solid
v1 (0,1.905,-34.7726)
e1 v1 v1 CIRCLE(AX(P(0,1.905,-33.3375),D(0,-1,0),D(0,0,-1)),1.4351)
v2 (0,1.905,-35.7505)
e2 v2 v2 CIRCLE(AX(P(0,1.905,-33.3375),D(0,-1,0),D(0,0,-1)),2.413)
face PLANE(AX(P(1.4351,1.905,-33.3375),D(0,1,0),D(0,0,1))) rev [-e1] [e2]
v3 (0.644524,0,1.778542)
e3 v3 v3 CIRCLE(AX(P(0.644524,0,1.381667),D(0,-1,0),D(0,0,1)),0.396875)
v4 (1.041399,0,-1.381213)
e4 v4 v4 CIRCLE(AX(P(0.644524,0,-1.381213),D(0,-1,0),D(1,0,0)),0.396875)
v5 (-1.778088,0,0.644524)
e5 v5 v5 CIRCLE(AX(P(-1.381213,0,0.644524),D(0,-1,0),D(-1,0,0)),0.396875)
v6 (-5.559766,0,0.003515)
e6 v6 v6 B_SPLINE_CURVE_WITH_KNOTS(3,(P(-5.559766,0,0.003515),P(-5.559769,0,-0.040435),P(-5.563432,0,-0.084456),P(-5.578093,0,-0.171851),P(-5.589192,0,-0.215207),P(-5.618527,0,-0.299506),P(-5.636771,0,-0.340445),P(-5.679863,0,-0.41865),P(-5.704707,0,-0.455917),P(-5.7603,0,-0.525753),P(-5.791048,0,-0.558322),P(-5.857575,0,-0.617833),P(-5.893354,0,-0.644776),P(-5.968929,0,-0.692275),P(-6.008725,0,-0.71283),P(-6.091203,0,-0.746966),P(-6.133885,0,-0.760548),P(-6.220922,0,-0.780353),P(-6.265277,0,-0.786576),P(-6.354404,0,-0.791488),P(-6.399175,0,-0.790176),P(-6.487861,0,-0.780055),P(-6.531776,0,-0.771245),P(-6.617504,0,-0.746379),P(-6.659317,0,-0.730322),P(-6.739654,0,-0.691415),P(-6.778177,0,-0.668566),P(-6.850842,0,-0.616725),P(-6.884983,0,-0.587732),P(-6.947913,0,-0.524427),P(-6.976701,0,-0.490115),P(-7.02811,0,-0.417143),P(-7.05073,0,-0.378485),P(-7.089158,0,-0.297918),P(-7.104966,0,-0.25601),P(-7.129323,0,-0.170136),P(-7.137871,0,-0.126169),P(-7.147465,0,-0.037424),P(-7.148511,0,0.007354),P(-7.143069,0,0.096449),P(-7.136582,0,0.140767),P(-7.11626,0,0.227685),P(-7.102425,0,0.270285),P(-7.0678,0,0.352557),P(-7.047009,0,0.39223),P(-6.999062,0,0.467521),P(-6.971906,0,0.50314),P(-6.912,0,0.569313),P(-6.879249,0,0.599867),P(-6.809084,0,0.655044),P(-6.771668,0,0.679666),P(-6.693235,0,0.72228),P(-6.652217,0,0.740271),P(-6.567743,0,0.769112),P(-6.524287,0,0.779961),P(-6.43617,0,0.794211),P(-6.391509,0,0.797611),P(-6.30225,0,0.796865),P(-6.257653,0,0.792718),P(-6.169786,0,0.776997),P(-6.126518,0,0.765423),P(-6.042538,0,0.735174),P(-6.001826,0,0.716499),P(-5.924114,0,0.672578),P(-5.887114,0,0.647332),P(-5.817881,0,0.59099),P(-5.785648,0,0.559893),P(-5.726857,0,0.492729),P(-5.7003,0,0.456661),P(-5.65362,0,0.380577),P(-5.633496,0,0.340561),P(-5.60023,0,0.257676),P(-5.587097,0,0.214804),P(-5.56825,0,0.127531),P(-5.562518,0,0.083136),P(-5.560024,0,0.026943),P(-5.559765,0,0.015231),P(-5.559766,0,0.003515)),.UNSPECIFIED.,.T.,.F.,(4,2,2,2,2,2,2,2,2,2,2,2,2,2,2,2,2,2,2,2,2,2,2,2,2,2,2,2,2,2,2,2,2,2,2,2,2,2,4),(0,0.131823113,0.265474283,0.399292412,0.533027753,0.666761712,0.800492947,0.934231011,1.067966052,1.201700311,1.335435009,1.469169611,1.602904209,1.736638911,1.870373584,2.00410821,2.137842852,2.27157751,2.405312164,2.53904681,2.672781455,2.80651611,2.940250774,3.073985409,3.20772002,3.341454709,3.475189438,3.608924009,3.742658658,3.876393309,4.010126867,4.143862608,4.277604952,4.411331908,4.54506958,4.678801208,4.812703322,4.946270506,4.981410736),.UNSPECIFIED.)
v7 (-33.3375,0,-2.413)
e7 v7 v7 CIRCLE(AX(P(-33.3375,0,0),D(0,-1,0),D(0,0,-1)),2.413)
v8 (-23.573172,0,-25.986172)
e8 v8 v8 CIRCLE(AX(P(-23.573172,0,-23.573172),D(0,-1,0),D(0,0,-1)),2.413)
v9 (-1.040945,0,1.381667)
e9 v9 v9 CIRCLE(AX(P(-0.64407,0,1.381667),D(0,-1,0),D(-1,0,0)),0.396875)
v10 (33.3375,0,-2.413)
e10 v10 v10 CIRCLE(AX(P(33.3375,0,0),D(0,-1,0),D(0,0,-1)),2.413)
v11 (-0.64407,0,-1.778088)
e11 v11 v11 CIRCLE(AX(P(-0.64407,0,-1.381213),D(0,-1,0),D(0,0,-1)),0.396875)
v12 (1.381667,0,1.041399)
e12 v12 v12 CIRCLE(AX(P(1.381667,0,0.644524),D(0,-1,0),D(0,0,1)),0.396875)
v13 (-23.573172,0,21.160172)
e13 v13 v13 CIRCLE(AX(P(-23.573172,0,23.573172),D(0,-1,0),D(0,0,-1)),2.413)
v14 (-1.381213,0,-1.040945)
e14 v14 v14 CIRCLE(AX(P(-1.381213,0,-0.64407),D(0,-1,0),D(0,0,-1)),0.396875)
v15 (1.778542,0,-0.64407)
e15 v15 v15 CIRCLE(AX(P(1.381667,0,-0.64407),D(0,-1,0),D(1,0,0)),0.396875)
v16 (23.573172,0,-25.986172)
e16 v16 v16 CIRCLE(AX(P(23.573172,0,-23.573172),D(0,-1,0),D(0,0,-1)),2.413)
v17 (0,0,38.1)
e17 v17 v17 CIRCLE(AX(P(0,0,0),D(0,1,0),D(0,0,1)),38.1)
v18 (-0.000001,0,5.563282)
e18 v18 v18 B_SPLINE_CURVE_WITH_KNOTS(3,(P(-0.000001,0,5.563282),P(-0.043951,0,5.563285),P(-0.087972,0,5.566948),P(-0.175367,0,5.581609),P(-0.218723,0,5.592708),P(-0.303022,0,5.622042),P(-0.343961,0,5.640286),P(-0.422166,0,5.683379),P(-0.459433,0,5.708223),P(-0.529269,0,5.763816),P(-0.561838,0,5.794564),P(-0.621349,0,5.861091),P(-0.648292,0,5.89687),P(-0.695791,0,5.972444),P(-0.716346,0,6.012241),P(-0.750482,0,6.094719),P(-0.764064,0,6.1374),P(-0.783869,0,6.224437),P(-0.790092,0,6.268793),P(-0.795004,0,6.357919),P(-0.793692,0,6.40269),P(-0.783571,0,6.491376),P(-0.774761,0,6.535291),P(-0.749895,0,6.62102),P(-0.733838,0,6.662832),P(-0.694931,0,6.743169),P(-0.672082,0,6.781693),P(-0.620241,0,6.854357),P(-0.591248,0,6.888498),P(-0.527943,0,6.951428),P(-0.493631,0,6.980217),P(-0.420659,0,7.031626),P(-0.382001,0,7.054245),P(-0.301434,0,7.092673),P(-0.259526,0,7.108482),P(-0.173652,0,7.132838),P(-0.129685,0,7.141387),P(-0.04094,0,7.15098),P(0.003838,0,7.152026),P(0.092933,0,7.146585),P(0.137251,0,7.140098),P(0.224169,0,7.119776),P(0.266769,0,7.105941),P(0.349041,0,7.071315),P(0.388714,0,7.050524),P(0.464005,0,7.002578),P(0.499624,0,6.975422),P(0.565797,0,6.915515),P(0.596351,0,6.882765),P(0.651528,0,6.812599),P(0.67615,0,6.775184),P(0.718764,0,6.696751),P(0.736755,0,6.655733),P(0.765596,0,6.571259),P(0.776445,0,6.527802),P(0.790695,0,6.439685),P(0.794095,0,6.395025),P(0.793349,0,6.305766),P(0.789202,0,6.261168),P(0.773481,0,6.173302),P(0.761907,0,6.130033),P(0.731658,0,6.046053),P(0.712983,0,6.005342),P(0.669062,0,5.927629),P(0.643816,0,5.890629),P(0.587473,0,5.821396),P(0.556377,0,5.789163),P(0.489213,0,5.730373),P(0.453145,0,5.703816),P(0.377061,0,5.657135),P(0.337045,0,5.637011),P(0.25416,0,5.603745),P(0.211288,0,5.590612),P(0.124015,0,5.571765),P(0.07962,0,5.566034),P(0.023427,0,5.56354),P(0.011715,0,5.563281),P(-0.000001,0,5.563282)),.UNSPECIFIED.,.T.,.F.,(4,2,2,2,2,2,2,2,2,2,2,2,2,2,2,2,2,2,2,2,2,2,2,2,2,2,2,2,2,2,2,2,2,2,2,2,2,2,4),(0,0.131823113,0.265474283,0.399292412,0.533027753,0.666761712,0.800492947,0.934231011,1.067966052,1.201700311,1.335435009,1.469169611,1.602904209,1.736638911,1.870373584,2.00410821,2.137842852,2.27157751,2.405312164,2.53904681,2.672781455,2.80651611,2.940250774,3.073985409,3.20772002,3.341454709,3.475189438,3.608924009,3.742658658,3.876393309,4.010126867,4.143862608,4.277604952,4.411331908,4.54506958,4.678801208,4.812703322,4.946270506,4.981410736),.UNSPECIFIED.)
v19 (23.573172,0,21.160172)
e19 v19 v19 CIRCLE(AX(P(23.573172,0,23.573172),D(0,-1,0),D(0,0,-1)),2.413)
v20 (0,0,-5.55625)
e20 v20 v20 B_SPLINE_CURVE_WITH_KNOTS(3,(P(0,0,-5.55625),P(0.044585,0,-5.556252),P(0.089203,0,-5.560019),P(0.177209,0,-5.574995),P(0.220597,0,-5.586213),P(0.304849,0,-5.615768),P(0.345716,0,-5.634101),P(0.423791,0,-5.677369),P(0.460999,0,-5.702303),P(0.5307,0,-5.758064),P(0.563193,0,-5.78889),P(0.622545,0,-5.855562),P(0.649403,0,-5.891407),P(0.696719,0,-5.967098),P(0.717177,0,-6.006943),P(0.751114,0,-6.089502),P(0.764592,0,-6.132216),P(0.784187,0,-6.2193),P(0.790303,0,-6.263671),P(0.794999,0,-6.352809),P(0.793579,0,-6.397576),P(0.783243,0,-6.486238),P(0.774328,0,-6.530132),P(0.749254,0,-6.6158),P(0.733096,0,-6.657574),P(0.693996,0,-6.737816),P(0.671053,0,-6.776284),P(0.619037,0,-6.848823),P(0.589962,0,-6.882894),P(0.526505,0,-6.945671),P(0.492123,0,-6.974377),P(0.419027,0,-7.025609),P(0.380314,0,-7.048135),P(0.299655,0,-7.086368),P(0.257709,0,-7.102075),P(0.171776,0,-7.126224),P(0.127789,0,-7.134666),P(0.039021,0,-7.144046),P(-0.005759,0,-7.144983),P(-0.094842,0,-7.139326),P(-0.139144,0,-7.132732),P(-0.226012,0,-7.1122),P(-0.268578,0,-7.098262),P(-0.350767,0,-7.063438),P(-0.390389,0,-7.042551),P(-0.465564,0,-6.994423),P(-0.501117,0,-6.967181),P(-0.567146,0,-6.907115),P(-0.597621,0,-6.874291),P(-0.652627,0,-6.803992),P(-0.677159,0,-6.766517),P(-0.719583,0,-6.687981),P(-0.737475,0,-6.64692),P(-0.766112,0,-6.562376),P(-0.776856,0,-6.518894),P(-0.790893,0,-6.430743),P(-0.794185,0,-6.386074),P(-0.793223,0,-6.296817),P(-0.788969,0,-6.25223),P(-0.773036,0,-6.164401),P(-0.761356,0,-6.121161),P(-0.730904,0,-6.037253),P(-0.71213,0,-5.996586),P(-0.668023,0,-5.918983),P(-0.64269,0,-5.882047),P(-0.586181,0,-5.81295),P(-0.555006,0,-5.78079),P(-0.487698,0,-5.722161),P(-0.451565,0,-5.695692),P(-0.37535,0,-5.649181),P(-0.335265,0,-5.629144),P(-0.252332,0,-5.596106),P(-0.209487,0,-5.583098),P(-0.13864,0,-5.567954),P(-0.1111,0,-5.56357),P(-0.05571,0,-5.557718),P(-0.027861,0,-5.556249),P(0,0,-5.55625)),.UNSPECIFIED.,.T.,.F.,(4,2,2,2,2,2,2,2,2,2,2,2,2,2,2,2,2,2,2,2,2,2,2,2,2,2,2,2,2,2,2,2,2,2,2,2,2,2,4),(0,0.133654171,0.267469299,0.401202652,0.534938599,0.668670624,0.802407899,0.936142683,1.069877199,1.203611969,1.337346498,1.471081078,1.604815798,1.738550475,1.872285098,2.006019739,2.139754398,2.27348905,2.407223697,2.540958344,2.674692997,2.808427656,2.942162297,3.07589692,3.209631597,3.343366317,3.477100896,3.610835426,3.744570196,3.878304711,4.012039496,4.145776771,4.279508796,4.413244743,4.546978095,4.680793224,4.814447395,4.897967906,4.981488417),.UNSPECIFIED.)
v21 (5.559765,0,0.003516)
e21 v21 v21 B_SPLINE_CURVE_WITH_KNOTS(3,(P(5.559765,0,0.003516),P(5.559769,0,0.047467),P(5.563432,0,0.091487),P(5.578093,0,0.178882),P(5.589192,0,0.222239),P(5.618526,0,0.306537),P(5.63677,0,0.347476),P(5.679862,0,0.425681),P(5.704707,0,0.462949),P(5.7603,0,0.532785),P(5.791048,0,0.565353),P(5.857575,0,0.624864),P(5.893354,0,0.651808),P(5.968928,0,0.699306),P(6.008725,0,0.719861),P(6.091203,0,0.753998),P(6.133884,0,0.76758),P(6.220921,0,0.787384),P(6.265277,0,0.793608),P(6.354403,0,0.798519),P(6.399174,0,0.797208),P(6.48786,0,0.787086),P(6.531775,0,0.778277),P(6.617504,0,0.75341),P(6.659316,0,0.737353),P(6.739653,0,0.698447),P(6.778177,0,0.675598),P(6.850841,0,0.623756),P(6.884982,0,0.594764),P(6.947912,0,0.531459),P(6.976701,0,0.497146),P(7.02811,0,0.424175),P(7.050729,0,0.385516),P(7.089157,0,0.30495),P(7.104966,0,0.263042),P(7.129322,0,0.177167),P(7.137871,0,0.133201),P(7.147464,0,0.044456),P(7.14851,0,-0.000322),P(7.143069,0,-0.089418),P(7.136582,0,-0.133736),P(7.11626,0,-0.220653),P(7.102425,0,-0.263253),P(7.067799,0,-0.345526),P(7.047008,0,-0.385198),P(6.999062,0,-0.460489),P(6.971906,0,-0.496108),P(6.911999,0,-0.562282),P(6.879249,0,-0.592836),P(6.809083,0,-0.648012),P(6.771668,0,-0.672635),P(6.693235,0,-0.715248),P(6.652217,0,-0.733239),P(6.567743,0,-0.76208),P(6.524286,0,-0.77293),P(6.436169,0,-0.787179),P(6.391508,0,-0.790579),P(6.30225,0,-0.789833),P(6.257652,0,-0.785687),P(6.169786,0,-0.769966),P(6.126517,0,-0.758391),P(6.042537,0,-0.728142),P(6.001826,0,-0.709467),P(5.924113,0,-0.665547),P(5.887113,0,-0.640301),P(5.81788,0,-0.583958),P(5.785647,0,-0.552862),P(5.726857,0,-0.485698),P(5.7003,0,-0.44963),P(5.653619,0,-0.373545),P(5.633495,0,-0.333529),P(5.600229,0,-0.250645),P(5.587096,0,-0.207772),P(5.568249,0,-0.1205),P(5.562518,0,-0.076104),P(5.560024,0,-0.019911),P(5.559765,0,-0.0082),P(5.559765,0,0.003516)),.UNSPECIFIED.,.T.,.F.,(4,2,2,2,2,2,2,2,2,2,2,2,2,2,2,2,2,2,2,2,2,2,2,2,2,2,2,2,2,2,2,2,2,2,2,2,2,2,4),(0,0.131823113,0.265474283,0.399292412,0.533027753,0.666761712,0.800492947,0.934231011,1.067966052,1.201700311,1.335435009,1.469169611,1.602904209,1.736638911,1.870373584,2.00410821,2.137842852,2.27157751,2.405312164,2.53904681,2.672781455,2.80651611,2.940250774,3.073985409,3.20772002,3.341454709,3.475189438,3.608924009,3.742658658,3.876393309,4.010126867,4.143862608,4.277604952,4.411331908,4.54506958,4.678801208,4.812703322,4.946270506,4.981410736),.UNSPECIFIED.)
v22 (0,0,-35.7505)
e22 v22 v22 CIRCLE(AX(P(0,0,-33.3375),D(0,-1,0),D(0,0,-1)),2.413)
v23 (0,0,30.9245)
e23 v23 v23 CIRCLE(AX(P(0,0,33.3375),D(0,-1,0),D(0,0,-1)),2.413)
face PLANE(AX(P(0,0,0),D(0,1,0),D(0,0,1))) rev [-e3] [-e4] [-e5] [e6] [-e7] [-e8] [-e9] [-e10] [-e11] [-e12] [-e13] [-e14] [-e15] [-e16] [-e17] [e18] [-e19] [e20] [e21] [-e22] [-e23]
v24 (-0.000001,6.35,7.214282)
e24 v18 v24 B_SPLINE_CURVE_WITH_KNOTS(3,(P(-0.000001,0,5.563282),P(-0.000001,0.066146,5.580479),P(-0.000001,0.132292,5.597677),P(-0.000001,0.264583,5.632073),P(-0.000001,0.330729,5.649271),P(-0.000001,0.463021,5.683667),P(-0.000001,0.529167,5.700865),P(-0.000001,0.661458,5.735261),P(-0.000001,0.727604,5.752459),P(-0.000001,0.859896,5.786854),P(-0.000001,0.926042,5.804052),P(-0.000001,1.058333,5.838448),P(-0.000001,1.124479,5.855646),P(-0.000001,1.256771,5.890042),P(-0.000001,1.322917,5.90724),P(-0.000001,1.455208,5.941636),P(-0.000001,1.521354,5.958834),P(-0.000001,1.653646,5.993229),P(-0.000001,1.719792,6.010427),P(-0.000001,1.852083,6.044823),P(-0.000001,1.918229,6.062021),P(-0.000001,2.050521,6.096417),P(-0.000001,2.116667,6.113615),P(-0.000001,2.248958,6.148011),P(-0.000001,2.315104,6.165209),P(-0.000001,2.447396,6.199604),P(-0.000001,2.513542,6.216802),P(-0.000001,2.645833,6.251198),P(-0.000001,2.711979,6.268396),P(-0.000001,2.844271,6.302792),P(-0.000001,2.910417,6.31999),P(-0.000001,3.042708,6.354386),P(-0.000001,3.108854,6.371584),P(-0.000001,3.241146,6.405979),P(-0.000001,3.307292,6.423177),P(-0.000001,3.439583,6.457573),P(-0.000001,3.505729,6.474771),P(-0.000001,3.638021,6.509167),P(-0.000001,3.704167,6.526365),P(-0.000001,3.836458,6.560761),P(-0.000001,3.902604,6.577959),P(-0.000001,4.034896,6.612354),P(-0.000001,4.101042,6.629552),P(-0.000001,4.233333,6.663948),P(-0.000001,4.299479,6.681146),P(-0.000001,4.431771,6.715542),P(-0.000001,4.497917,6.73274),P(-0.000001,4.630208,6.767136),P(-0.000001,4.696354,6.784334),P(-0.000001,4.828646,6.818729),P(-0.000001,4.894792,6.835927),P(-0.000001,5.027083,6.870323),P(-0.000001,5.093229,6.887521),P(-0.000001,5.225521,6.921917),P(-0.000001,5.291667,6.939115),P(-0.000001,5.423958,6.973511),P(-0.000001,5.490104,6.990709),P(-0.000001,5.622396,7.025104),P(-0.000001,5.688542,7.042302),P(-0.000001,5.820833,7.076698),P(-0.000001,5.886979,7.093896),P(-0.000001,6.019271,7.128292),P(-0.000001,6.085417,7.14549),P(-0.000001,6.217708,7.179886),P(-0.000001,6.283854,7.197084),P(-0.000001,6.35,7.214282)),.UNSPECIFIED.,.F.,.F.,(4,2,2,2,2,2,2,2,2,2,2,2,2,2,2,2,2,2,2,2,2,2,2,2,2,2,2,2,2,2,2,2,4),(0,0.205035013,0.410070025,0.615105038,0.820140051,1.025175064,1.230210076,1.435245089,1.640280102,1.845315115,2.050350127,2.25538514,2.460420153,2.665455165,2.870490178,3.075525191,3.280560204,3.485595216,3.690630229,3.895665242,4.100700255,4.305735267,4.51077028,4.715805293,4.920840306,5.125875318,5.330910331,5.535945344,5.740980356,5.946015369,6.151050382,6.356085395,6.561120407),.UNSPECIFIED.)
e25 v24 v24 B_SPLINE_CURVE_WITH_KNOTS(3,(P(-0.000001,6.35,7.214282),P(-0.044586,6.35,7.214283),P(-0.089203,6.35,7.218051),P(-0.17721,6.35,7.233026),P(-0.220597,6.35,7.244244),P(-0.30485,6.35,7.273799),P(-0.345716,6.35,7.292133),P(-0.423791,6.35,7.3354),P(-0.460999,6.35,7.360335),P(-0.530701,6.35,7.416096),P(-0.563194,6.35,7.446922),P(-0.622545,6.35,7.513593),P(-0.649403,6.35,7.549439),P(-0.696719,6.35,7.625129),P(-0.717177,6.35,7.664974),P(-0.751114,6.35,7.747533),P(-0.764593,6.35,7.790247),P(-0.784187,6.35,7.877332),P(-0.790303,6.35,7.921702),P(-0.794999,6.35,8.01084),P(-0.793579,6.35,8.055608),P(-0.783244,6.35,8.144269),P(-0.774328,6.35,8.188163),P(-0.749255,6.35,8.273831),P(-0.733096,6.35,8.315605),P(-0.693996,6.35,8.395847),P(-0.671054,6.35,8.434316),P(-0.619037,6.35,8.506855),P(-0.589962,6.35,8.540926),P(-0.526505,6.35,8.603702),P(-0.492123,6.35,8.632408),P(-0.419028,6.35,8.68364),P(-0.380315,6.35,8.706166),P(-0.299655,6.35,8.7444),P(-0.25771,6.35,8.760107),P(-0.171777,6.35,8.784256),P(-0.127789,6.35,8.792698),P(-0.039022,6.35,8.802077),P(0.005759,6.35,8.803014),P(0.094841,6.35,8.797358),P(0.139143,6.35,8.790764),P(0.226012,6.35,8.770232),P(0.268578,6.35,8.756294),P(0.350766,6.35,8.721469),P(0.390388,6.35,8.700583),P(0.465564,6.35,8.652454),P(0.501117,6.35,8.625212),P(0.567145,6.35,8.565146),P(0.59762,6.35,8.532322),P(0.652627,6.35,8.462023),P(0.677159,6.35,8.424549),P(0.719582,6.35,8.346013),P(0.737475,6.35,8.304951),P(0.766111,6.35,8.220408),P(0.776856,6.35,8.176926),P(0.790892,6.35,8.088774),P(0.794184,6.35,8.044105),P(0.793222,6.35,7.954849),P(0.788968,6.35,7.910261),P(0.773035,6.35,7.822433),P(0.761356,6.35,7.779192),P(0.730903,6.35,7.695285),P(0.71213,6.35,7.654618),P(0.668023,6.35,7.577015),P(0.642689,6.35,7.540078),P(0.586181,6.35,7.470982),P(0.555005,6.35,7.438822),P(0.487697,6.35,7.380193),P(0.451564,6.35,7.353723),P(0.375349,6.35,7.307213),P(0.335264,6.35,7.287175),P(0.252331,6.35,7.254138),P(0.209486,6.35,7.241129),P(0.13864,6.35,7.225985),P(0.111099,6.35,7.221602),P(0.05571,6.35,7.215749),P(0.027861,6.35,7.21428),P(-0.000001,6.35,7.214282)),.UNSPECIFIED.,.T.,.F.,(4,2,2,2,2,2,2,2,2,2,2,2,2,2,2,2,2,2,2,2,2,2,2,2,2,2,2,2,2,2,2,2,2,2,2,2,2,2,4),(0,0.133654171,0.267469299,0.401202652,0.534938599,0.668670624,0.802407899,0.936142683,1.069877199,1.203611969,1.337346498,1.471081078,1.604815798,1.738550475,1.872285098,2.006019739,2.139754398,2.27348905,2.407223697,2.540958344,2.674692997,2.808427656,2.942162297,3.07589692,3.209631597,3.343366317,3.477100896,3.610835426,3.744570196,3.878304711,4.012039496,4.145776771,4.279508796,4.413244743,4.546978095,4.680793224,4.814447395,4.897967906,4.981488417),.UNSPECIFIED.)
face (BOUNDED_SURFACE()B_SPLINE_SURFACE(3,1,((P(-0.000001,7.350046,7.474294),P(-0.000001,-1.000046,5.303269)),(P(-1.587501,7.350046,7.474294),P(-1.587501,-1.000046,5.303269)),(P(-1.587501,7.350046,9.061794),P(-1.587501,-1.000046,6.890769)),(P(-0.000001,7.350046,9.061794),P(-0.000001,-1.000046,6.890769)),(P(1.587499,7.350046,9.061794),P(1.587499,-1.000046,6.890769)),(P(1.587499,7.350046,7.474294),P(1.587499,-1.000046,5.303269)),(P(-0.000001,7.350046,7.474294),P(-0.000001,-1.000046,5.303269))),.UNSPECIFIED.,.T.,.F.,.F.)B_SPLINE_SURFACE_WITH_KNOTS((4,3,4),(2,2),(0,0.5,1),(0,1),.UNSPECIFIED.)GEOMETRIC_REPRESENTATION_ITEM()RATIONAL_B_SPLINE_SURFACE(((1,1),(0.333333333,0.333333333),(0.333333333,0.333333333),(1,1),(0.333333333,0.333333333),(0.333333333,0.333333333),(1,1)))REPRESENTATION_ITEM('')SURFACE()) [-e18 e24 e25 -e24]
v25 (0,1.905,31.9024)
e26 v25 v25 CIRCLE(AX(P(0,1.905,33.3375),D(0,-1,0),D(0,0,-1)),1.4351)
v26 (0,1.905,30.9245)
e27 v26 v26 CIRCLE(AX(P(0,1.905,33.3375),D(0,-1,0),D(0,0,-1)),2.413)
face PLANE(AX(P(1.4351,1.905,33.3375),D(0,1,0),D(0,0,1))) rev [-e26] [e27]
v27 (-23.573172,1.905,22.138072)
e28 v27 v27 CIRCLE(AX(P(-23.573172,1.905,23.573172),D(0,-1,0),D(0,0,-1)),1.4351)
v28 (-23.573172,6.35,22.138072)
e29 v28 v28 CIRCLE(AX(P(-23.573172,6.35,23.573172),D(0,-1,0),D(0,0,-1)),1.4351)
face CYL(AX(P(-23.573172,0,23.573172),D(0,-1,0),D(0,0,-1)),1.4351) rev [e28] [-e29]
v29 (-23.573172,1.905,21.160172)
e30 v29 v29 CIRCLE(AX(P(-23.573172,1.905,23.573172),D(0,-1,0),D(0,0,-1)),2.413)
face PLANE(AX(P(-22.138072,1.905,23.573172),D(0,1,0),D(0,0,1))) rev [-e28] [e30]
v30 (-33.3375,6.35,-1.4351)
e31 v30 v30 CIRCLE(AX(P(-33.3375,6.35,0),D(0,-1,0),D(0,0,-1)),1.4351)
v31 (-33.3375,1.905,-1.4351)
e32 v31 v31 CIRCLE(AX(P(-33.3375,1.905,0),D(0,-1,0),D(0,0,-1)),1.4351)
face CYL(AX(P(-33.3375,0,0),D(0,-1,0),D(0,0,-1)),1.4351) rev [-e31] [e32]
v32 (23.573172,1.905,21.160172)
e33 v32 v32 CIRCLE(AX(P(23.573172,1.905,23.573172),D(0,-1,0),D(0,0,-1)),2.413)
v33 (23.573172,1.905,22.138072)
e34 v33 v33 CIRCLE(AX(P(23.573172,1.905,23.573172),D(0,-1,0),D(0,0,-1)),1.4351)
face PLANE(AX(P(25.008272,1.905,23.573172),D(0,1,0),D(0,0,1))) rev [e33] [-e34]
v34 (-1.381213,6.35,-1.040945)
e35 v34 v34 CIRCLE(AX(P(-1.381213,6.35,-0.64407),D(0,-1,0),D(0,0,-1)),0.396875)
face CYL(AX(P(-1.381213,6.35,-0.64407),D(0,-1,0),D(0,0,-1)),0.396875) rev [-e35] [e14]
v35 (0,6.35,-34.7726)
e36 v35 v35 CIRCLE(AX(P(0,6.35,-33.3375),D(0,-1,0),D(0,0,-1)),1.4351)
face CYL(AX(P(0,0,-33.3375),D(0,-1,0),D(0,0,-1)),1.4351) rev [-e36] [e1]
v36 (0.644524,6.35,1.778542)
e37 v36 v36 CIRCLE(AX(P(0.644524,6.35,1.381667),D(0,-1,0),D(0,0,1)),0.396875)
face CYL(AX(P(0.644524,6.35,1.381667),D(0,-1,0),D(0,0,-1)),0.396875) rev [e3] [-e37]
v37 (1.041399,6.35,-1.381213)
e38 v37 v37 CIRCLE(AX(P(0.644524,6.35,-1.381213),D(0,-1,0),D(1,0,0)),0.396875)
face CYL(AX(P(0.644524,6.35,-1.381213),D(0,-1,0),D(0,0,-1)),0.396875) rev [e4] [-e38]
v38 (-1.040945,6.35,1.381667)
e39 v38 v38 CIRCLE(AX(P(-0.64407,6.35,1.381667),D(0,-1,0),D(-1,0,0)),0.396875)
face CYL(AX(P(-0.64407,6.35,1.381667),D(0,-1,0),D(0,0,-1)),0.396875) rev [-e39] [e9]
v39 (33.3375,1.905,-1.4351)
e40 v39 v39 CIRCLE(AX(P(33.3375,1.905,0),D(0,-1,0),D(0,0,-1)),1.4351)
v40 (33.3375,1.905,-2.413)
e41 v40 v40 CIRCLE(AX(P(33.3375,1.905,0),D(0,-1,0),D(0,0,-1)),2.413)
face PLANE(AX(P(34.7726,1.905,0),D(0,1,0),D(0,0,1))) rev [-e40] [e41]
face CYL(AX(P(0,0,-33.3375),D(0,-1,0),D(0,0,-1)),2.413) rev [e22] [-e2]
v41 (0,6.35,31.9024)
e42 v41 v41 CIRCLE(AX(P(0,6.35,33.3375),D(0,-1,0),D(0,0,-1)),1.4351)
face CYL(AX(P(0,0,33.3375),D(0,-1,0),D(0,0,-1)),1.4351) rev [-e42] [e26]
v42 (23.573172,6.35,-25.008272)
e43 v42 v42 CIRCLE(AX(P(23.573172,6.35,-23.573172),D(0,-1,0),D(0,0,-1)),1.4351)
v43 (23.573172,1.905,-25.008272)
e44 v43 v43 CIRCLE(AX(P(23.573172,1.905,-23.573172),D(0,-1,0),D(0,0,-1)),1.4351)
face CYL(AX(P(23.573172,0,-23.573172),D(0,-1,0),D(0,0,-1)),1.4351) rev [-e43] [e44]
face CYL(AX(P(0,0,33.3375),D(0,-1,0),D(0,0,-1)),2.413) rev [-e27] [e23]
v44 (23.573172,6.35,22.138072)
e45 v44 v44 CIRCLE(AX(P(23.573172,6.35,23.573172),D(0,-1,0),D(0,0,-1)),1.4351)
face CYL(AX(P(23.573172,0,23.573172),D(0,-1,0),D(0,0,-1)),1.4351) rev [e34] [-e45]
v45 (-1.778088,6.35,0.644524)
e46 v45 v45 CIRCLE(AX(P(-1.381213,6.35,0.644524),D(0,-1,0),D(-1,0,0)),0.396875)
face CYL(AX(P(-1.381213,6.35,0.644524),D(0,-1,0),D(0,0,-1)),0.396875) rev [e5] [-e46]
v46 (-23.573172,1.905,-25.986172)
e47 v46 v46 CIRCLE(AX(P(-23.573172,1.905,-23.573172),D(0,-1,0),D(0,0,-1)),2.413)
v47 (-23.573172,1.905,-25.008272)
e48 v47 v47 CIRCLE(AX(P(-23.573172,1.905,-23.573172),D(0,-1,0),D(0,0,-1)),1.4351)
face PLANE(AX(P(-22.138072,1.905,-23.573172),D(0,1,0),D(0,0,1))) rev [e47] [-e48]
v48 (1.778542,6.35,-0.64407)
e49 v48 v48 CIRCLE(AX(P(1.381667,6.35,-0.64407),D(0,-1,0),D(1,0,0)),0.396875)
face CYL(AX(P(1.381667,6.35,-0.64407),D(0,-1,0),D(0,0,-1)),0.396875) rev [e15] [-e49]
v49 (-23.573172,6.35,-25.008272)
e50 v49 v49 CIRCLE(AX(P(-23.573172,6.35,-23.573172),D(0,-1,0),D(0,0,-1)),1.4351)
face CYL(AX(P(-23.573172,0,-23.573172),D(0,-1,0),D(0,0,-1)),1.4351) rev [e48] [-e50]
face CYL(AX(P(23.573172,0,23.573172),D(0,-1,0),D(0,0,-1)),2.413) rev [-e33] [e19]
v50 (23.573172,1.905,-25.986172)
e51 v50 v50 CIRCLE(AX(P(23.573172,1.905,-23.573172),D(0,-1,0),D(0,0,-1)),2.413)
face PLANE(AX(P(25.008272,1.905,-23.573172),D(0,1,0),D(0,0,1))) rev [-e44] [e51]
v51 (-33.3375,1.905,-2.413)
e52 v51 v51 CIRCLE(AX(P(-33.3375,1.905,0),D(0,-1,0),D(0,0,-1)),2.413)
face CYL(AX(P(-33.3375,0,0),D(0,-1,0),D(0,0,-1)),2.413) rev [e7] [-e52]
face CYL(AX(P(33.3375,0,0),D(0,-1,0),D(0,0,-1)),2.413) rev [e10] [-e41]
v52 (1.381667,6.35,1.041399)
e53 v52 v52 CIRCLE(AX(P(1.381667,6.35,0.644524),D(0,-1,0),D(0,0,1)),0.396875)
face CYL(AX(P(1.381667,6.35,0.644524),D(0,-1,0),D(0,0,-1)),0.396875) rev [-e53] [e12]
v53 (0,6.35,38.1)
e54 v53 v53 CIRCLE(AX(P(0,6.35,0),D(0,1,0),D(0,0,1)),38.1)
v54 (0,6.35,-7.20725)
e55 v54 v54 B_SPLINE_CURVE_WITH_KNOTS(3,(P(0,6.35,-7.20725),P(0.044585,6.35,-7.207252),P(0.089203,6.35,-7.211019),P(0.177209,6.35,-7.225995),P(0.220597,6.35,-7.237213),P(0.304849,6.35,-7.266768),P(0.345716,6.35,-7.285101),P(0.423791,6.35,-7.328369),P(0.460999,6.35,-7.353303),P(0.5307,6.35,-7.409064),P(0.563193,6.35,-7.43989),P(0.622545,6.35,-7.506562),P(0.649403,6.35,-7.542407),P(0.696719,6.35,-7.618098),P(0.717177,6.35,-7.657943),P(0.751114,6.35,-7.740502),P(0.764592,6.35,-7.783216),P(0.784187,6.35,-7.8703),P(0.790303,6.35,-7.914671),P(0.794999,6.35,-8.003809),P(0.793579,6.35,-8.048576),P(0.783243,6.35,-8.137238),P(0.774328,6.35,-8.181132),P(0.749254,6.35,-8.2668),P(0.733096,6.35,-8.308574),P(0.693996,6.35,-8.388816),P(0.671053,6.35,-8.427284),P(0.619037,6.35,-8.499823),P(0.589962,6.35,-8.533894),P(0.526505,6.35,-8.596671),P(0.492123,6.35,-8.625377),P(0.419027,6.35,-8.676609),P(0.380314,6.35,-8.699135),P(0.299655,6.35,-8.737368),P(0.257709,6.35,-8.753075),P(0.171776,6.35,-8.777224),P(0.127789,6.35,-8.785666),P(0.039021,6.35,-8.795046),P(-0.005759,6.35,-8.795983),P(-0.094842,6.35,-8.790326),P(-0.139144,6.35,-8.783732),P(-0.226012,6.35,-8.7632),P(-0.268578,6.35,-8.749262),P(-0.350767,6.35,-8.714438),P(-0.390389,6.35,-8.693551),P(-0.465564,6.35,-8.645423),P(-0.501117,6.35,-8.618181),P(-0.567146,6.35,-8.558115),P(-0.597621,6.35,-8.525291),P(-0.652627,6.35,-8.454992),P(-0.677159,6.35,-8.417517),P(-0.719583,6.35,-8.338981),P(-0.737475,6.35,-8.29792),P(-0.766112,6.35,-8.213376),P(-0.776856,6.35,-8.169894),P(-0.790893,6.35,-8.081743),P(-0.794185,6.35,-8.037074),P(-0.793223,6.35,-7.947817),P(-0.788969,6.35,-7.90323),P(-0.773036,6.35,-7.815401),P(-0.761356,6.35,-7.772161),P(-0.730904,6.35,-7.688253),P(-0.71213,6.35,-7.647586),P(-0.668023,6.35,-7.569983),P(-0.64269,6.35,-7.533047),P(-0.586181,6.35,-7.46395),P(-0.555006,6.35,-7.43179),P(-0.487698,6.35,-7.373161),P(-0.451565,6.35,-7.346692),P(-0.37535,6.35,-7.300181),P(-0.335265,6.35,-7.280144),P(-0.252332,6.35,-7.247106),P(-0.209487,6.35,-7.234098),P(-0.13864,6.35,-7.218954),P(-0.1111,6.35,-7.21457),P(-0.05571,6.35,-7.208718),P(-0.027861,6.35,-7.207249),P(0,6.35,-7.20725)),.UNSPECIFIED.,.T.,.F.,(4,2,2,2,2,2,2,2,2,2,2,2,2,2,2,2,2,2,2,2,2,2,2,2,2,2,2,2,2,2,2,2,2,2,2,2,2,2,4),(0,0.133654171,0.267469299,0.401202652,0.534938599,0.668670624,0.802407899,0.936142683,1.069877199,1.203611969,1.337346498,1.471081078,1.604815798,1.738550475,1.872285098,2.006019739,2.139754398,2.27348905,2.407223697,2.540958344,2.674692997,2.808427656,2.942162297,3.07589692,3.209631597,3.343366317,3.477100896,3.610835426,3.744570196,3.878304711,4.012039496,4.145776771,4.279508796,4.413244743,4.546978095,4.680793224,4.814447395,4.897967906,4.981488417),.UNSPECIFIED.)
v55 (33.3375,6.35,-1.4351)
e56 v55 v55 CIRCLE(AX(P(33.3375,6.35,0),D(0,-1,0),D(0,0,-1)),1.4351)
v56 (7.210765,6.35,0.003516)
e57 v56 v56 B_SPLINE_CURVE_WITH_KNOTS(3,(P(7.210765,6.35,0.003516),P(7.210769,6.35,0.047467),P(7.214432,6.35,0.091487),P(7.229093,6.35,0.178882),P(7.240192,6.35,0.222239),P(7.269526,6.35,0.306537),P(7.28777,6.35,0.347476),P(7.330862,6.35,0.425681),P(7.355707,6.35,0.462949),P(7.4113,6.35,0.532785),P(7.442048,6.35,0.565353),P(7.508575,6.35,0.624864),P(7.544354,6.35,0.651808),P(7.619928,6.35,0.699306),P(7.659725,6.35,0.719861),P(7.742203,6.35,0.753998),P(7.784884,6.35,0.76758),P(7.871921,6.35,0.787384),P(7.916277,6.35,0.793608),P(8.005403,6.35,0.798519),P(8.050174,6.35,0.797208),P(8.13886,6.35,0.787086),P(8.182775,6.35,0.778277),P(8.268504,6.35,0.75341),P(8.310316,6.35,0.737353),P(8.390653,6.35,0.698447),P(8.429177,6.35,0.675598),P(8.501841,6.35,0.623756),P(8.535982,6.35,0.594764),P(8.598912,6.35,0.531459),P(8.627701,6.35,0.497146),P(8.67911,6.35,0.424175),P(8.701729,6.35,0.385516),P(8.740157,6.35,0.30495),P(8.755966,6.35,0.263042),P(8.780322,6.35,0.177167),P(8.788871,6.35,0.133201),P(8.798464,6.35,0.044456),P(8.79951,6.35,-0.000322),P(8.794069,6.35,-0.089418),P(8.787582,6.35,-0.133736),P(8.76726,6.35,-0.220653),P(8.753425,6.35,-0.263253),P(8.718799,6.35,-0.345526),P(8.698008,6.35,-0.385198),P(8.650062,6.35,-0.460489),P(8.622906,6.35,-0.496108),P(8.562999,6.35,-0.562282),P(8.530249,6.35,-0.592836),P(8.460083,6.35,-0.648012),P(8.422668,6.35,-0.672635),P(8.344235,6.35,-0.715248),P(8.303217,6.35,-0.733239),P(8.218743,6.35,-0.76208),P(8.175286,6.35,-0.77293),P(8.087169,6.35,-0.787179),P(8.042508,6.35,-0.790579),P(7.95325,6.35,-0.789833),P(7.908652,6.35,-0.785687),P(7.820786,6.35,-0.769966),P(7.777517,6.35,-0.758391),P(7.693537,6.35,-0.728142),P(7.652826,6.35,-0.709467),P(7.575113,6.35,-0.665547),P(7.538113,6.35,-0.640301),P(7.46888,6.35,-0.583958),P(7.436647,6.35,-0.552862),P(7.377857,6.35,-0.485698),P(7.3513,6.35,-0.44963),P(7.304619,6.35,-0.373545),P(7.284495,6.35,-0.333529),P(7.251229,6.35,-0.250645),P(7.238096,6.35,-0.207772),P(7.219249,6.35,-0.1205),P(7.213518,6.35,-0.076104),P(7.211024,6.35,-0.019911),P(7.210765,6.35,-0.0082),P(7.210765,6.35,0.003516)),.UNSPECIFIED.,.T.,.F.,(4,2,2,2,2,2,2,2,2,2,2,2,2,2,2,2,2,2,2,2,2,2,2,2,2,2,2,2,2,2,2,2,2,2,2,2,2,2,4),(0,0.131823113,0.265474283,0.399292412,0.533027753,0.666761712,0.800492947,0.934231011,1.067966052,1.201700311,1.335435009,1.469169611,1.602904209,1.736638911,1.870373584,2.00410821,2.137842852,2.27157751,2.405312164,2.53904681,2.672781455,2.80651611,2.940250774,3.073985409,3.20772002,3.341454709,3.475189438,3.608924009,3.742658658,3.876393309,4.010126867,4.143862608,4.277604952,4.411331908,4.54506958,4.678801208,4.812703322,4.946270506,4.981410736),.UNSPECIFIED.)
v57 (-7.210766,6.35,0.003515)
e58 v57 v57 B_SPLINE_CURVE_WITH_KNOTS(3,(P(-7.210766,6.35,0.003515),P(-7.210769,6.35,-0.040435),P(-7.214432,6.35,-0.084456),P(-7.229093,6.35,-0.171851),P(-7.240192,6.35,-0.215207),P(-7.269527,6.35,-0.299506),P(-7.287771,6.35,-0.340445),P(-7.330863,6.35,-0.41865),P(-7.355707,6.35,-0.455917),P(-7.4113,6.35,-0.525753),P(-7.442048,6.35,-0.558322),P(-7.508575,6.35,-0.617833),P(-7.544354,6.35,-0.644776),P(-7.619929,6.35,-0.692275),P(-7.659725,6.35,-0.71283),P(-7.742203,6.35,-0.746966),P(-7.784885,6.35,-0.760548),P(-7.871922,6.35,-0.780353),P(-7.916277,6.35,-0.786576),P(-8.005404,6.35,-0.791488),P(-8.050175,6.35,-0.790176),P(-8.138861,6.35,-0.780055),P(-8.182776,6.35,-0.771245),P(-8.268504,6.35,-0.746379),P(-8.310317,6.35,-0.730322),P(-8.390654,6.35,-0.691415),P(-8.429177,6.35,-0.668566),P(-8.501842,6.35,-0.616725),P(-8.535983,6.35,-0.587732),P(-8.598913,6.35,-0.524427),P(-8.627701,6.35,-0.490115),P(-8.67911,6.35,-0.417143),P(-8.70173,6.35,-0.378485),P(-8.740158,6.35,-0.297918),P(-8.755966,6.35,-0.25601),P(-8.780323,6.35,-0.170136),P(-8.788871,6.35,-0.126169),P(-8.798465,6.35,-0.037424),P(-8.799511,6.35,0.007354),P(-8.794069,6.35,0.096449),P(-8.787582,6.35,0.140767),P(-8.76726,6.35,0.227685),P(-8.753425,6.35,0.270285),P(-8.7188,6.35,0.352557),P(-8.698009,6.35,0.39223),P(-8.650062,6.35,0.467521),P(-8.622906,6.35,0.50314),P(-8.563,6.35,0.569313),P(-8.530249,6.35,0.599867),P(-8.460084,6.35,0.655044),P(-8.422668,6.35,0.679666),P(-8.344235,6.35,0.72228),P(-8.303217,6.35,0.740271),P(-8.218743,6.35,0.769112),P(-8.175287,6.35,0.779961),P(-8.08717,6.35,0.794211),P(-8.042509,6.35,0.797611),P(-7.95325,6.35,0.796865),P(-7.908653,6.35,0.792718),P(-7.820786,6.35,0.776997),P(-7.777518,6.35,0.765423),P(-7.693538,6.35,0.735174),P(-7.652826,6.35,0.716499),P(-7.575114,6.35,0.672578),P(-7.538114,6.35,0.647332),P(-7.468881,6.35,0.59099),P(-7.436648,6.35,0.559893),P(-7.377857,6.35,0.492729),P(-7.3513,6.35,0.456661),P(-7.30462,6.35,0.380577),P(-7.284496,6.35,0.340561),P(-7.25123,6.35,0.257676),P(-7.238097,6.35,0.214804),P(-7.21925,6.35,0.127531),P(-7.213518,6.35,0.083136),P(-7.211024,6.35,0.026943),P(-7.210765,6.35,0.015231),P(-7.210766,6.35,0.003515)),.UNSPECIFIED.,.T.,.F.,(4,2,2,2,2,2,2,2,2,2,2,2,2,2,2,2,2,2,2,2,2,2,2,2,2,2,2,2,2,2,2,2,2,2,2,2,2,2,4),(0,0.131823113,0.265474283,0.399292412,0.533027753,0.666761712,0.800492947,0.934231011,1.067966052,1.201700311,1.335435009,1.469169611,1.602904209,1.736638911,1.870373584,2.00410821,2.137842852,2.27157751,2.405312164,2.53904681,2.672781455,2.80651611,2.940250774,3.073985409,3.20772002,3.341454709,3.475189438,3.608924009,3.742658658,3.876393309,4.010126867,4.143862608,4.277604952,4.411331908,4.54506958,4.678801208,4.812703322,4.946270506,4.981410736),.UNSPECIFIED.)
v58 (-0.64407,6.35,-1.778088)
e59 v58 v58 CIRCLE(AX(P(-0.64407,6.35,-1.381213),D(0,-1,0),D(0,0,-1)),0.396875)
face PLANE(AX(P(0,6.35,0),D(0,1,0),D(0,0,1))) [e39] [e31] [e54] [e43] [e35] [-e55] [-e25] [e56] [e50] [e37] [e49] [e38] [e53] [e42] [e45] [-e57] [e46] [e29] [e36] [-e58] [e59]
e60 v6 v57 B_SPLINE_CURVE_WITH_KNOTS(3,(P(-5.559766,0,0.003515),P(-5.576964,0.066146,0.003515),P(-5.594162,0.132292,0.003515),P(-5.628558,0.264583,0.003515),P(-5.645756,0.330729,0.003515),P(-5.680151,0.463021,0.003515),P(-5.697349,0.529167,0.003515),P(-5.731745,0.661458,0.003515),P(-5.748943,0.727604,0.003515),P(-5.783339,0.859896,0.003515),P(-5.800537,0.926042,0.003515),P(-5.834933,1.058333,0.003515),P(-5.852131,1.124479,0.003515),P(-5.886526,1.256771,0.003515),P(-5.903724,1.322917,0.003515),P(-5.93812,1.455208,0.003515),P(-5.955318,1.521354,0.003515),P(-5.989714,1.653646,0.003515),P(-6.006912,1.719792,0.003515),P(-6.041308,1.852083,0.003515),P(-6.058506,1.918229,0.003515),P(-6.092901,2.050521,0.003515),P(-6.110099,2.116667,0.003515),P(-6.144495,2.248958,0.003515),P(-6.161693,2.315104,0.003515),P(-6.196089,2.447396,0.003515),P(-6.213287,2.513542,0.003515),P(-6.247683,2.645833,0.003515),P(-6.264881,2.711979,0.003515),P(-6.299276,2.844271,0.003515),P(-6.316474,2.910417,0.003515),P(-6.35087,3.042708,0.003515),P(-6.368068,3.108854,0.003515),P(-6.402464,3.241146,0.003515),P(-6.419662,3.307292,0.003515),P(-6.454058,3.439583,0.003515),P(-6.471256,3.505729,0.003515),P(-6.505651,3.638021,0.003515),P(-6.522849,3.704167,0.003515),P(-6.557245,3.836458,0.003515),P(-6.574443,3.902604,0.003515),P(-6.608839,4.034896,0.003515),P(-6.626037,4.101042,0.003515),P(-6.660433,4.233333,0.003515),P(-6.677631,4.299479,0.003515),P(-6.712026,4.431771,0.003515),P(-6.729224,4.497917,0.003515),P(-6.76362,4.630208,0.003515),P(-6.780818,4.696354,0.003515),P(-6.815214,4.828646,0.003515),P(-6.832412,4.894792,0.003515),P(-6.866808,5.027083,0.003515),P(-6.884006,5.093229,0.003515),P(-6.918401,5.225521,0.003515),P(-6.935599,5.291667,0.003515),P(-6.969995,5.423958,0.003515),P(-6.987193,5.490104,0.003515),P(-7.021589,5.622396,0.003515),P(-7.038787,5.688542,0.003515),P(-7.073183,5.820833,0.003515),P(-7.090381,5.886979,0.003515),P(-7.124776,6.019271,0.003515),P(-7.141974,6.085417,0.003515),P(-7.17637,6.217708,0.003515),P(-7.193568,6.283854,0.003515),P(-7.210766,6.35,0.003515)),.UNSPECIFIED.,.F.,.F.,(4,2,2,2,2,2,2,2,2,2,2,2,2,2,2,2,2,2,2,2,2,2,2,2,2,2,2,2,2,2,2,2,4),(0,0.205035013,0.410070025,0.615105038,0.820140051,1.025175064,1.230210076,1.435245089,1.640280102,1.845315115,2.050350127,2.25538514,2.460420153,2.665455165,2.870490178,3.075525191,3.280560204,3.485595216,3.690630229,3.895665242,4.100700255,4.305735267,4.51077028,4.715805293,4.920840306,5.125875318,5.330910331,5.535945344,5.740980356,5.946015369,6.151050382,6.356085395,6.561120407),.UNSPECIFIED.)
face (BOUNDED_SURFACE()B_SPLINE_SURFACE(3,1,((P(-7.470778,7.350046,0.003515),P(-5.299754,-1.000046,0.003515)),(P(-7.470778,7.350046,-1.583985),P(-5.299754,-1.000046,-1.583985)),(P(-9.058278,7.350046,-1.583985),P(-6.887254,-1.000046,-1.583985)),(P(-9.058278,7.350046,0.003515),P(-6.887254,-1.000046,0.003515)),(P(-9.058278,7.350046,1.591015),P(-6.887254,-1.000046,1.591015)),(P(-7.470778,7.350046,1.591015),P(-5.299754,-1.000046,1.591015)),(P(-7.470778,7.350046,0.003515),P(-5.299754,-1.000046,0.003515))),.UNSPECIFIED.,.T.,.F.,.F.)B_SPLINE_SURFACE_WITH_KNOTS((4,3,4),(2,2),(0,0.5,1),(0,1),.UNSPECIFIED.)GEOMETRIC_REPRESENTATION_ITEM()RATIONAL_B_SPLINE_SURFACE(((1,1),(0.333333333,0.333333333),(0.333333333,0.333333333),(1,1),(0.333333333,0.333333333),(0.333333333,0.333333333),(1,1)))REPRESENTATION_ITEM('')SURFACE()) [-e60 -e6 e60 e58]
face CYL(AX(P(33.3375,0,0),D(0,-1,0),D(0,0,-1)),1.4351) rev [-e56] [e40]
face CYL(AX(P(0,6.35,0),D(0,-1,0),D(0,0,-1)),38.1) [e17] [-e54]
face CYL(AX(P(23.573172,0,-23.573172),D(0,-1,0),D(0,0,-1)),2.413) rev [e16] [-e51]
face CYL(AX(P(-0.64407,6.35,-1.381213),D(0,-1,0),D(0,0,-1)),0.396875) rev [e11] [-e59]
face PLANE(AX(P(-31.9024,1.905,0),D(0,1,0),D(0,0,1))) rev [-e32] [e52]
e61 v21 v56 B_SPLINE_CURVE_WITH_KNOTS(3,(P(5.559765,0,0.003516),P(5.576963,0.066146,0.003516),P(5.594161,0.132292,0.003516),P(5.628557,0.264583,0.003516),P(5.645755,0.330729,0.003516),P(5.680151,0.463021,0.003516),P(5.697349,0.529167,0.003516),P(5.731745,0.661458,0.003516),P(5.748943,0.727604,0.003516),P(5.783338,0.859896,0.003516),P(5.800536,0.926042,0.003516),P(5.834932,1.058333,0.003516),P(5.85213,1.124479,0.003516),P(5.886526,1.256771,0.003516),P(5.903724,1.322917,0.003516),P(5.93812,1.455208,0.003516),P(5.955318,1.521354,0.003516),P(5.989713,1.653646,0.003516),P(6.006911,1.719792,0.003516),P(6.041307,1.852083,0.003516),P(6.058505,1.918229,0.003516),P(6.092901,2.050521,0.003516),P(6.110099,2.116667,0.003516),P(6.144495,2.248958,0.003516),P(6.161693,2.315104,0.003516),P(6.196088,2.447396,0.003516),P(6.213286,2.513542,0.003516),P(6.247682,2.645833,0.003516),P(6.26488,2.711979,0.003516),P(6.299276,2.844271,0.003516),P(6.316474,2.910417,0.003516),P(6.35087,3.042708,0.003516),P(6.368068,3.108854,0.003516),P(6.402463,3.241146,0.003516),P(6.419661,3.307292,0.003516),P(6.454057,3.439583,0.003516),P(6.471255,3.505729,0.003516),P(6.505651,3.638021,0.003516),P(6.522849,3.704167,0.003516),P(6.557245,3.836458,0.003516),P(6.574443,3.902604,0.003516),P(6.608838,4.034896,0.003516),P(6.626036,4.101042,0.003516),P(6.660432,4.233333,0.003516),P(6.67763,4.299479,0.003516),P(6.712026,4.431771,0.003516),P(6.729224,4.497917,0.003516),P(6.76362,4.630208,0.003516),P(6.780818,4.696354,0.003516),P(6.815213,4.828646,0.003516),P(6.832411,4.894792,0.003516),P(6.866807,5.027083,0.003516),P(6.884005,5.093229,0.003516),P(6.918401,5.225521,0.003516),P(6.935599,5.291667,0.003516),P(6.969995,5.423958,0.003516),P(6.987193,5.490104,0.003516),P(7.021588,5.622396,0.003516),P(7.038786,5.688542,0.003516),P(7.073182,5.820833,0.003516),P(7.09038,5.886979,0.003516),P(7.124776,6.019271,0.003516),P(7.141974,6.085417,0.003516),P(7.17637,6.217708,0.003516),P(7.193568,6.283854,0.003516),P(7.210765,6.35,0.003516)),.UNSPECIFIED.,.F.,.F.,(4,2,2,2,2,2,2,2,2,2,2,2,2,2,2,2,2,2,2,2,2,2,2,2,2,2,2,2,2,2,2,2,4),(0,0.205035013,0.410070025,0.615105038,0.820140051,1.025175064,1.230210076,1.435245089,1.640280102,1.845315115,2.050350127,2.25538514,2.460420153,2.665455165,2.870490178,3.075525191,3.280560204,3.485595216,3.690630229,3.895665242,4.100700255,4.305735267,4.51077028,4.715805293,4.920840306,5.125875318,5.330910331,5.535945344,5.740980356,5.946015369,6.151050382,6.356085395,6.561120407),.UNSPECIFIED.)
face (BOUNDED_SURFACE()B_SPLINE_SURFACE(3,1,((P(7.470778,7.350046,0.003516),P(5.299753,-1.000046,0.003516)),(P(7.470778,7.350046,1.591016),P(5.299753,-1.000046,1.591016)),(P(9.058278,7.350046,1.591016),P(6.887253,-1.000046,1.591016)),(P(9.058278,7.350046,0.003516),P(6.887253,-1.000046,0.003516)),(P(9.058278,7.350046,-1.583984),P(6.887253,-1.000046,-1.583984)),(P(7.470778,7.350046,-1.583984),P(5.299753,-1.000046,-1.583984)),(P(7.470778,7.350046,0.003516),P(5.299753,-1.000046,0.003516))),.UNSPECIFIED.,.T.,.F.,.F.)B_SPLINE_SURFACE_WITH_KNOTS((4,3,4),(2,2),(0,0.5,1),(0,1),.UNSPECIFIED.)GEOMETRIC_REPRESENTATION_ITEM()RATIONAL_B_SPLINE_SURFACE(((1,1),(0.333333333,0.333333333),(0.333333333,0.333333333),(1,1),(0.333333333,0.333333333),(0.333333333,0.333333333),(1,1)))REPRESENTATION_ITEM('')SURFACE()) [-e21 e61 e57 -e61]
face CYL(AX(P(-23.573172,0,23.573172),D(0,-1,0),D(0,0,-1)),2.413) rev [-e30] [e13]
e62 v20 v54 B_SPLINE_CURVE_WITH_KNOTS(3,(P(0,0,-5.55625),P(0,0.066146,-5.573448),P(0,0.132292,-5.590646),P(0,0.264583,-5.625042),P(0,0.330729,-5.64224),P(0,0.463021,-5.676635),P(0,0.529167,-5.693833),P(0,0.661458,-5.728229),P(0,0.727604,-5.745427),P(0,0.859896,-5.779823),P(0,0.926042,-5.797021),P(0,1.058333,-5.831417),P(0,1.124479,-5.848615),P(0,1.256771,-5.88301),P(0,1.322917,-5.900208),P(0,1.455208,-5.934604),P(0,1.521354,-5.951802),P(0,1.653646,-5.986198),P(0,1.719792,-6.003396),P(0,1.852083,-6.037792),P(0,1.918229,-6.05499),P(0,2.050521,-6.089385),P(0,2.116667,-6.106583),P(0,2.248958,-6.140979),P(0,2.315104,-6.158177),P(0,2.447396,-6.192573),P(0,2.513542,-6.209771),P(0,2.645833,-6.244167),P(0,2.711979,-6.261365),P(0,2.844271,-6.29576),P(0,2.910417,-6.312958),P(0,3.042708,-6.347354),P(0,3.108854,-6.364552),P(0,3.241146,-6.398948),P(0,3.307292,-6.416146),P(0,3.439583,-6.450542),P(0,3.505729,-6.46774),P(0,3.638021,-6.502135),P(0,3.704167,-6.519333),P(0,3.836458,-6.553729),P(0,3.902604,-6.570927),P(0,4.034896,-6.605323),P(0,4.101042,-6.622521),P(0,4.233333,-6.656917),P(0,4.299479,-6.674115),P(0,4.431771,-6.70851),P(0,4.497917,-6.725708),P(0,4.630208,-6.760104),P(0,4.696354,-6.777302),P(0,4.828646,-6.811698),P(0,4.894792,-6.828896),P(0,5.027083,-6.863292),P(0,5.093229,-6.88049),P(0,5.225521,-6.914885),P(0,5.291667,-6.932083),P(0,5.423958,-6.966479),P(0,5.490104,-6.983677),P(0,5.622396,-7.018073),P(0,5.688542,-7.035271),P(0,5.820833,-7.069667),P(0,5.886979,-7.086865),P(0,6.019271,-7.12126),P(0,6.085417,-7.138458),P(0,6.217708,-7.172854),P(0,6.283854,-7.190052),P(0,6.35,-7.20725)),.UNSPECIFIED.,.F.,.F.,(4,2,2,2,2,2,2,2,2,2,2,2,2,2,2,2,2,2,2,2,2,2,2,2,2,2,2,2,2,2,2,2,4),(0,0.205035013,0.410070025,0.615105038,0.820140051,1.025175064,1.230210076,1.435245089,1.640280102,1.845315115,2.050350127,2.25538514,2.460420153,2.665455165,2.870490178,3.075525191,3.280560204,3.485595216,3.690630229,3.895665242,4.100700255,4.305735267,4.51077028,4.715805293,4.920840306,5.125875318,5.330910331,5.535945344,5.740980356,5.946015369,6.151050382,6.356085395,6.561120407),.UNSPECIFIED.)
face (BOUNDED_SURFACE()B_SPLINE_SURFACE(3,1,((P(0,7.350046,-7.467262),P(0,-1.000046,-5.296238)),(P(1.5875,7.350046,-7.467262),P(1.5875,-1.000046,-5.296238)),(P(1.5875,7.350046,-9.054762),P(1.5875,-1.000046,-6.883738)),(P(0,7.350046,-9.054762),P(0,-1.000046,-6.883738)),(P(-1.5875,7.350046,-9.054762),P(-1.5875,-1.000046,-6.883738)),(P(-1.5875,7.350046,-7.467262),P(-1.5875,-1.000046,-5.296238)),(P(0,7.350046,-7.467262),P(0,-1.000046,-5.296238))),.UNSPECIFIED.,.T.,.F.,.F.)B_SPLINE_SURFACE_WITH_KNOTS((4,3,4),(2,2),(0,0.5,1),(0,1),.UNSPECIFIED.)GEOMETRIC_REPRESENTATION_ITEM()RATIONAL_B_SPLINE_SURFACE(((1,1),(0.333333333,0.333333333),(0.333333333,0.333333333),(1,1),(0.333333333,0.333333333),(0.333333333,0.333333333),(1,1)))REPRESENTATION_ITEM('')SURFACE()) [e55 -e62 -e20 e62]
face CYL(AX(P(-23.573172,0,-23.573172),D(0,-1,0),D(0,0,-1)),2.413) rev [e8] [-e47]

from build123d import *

# Parameters (mm, degrees)
SKETCH1_R                                      = 38.1
BOSS_EXTRUDE1_DEPTH                            = 6.35
CBORE_FOR_4_BUTTON_HEAD_CAP_SCREW1_D           = 2.8702
CBORE_FOR_4_BUTTON_HEAD_CAP_SCREW1_CBORE_D     = 4.826
CBORE_FOR_4_BUTTON_HEAD_CAP_SCREW1_CBORE_DEPTH = 1.905
CIRPATTERN1_COUNT                              = 8
SKETCH6_R                                      = 0.396875
CUT_EXTRUDE1_DEPTH                             = 55.254423783
CIRPATTERN2_COUNT                              = 4
SKETCH7_R                                      = 0.79375


with BuildPart() as part:
    # Sketch1 → Boss-Extrude1 (new body)
    with BuildSketch(Plane(origin=(0, 0, 0), x_dir=(1, 0, 0), z_dir=(0, 1, 0))):
        with Locations(Location((0, 0, 0), (0, 0, 270))):
            Circle(SKETCH1_R)
    extrude(amount=BOSS_EXTRUDE1_DEPTH)

    # CBORE for #4 Button Head Cap Screw1 (through all)
    with Locations(Plane(origin=(0, 0, 0), x_dir=(-1, 0, 0), z_dir=(0, -1, 0))):
        with Locations((0, -33.3375)):
            cbore_for_4_button_head_cap_screw1 = CounterBoreHole(CBORE_FOR_4_BUTTON_HEAD_CAP_SCREW1_D / 2, CBORE_FOR_4_BUTTON_HEAD_CAP_SCREW1_CBORE_D / 2, CBORE_FOR_4_BUTTON_HEAD_CAP_SCREW1_CBORE_DEPTH)

    # CirPattern1: CBORE for #4 Button Head Cap Screw1 ×8 about axis
    cirpattern1_axis = Axis((0, 0, 0), (0, 1, 0))
    for i in range(1, CIRPATTERN1_COUNT):
        add(cbore_for_4_button_head_cap_screw1.rotate(cirpattern1_axis, i * 360 / CIRPATTERN1_COUNT), mode=Mode.SUBTRACT)

    # Sketch6 → Cut-Extrude1 (cut, through all)
    with BuildSketch(Plane.XZ):
        with Locations(Location((-0.644070231, -1.381213067, 0), (0, 0, 270))):
            Circle(SKETCH6_R)
        with Locations(Location((-1.381213067, -0.644070231, 0), (0, 0, 270))):
            Circle(SKETCH6_R)
    cut_extrude1 = extrude(amount=-CUT_EXTRUDE1_DEPTH, mode=Mode.SUBTRACT)

    # CirPattern2: Cut-Extrude1 ×4 about axis
    cirpattern2_axis = Axis((0.000227094, 0, 0.000227094), (0, 1, 0))
    for i in range(1, CIRPATTERN2_COUNT):
        add(cut_extrude1.rotate(cirpattern2_axis, i * 360 / CIRPATTERN2_COUNT), mode=Mode.SUBTRACT)

    # Cut-Sweep1: sweep along a curve in space
    with BuildLine() as cut_sweep1_path:
        Line((0, 6.35, -8.001), (0, 0, -6.35))
    # Sketch7 → Cut-Sweep1 (sweep, cut)
    with BuildSketch(Plane(origin=(0, 6.35, 0), x_dir=(1, 0, 0), z_dir=(0, 1, 0))):
        with Locations((0, 8.001)):
            Circle(SKETCH7_R)
    sweep(path=cut_sweep1_path.line, mode=Mode.SUBTRACT)

    # CirPattern3: read off the stored shape, not the designer's step
    # CirPattern3: loft between two sections, ruled curve by curve
    cirpattern3_from = [
        Edge.make_bspline([(-7.470778066, 7.350046313, 0.003515494), (-7.470778066, 7.350046313, -1.583984506), (-9.058278066, 7.350046313, -1.583984506), (-9.058278066, 7.350046313, 0.003515494), (-9.058278066, 7.350046313, 1.591015494), (-7.470778066, 7.350046313, 1.591015494), (-7.470778066, 7.350046313, 0.003515494)], [0, 0, 0, 0, 0.5, 0.5, 0.5, 1, 1, 1, 1], 3, [1, 0.333333333, 0.333333333, 1, 0.333333333, 0.333333333, 1]),
    ]
    cirpattern3_to = [
        Edge.make_bspline([(-5.299753984, -1.000046313, 0.003515494), (-5.299753984, -1.000046313, -1.583984506), (-6.887253984, -1.000046313, -1.583984506), (-6.887253984, -1.000046313, 0.003515494), (-6.887253984, -1.000046313, 1.591015494), (-5.299753984, -1.000046313, 1.591015494), (-5.299753984, -1.000046313, 0.003515494)], [0, 0, 0, 0, 0.5, 0.5, 0.5, 1, 1, 1, 1], 3, [1, 0.333333333, 0.333333333, 1, 0.333333333, 0.333333333, 1]),
    ]
    cirpattern3 = Solid(Shell([*[Face.make_surface_from_curves(cirpattern3_from[k], cirpattern3_to[k]) for k in range(1)], Face(Wire(cirpattern3_from)), Face(Wire(cirpattern3_to))]))
    add(cirpattern3, mode=Mode.SUBTRACT)

    # CirPattern3 2: loft between two sections, ruled curve by curve
    cirpattern3_2_from = [
        Edge.make_bspline([(-5.31e-07, 7.350046313, 7.474293561), (-1.587500531, 7.350046313, 7.474293561), (-1.587500531, 7.350046313, 9.061793561), (-5.31e-07, 7.350046313, 9.061793561), (1.587499469, 7.350046313, 9.061793561), (1.587499469, 7.350046313, 7.474293561), (-5.31e-07, 7.350046313, 7.474293561)], [0, 0, 0, 0, 0.5, 0.5, 0.5, 1, 1, 1, 1], 3, [1, 0.333333333, 0.333333333, 1, 0.333333333, 0.333333333, 1]),
    ]
    cirpattern3_2_to = [
        Edge.make_bspline([(-5.31e-07, -1.000046313, 5.303269478), (-1.587500531, -1.000046313, 5.303269478), (-1.587500531, -1.000046313, 6.890769478), (-5.31e-07, -1.000046313, 6.890769478), (1.587499469, -1.000046313, 6.890769478), (1.587499469, -1.000046313, 5.303269478), (-5.31e-07, -1.000046313, 5.303269478)], [0, 0, 0, 0, 0.5, 0.5, 0.5, 1, 1, 1, 1], 3, [1, 0.333333333, 0.333333333, 1, 0.333333333, 0.333333333, 1]),
    ]
    cirpattern3_2 = Solid(Shell([*[Face.make_surface_from_curves(cirpattern3_2_from[k], cirpattern3_2_to[k]) for k in range(1)], Face(Wire(cirpattern3_2_from)), Face(Wire(cirpattern3_2_to))]))
    add(cirpattern3_2, mode=Mode.SUBTRACT)

    # CirPattern3 3: loft between two sections, ruled curve by curve
    cirpattern3_3_from = [
        Edge.make_bspline([(7.470777536, 7.350046313, 0.003516025), (7.470777536, 7.350046313, 1.591016025), (9.058277536, 7.350046313, 1.591016025), (9.058277536, 7.350046313, 0.003516025), (9.058277536, 7.350046313, -1.583983975), (7.470777536, 7.350046313, -1.583983975), (7.470777536, 7.350046313, 0.003516025)], [0, 0, 0, 0, 0.5, 0.5, 0.5, 1, 1, 1, 1], 3, [1, 0.333333333, 0.333333333, 1, 0.333333333, 0.333333333, 1]),
    ]
    cirpattern3_3_to = [
        Edge.make_bspline([(5.299753453, -1.000046313, 0.003516025), (5.299753453, -1.000046313, 1.591016025), (6.887253453, -1.000046313, 1.591016025), (6.887253453, -1.000046313, 0.003516025), (6.887253453, -1.000046313, -1.583983975), (5.299753453, -1.000046313, -1.583983975), (5.299753453, -1.000046313, 0.003516025)], [0, 0, 0, 0, 0.5, 0.5, 0.5, 1, 1, 1, 1], 3, [1, 0.333333333, 0.333333333, 1, 0.333333333, 0.333333333, 1]),
    ]
    cirpattern3_3 = Solid(Shell([*[Face.make_surface_from_curves(cirpattern3_3_from[k], cirpattern3_3_to[k]) for k in range(1)], Face(Wire(cirpattern3_3_from)), Face(Wire(cirpattern3_3_to))]))
    add(cirpattern3_3, mode=Mode.SUBTRACT)


solid = part.part
